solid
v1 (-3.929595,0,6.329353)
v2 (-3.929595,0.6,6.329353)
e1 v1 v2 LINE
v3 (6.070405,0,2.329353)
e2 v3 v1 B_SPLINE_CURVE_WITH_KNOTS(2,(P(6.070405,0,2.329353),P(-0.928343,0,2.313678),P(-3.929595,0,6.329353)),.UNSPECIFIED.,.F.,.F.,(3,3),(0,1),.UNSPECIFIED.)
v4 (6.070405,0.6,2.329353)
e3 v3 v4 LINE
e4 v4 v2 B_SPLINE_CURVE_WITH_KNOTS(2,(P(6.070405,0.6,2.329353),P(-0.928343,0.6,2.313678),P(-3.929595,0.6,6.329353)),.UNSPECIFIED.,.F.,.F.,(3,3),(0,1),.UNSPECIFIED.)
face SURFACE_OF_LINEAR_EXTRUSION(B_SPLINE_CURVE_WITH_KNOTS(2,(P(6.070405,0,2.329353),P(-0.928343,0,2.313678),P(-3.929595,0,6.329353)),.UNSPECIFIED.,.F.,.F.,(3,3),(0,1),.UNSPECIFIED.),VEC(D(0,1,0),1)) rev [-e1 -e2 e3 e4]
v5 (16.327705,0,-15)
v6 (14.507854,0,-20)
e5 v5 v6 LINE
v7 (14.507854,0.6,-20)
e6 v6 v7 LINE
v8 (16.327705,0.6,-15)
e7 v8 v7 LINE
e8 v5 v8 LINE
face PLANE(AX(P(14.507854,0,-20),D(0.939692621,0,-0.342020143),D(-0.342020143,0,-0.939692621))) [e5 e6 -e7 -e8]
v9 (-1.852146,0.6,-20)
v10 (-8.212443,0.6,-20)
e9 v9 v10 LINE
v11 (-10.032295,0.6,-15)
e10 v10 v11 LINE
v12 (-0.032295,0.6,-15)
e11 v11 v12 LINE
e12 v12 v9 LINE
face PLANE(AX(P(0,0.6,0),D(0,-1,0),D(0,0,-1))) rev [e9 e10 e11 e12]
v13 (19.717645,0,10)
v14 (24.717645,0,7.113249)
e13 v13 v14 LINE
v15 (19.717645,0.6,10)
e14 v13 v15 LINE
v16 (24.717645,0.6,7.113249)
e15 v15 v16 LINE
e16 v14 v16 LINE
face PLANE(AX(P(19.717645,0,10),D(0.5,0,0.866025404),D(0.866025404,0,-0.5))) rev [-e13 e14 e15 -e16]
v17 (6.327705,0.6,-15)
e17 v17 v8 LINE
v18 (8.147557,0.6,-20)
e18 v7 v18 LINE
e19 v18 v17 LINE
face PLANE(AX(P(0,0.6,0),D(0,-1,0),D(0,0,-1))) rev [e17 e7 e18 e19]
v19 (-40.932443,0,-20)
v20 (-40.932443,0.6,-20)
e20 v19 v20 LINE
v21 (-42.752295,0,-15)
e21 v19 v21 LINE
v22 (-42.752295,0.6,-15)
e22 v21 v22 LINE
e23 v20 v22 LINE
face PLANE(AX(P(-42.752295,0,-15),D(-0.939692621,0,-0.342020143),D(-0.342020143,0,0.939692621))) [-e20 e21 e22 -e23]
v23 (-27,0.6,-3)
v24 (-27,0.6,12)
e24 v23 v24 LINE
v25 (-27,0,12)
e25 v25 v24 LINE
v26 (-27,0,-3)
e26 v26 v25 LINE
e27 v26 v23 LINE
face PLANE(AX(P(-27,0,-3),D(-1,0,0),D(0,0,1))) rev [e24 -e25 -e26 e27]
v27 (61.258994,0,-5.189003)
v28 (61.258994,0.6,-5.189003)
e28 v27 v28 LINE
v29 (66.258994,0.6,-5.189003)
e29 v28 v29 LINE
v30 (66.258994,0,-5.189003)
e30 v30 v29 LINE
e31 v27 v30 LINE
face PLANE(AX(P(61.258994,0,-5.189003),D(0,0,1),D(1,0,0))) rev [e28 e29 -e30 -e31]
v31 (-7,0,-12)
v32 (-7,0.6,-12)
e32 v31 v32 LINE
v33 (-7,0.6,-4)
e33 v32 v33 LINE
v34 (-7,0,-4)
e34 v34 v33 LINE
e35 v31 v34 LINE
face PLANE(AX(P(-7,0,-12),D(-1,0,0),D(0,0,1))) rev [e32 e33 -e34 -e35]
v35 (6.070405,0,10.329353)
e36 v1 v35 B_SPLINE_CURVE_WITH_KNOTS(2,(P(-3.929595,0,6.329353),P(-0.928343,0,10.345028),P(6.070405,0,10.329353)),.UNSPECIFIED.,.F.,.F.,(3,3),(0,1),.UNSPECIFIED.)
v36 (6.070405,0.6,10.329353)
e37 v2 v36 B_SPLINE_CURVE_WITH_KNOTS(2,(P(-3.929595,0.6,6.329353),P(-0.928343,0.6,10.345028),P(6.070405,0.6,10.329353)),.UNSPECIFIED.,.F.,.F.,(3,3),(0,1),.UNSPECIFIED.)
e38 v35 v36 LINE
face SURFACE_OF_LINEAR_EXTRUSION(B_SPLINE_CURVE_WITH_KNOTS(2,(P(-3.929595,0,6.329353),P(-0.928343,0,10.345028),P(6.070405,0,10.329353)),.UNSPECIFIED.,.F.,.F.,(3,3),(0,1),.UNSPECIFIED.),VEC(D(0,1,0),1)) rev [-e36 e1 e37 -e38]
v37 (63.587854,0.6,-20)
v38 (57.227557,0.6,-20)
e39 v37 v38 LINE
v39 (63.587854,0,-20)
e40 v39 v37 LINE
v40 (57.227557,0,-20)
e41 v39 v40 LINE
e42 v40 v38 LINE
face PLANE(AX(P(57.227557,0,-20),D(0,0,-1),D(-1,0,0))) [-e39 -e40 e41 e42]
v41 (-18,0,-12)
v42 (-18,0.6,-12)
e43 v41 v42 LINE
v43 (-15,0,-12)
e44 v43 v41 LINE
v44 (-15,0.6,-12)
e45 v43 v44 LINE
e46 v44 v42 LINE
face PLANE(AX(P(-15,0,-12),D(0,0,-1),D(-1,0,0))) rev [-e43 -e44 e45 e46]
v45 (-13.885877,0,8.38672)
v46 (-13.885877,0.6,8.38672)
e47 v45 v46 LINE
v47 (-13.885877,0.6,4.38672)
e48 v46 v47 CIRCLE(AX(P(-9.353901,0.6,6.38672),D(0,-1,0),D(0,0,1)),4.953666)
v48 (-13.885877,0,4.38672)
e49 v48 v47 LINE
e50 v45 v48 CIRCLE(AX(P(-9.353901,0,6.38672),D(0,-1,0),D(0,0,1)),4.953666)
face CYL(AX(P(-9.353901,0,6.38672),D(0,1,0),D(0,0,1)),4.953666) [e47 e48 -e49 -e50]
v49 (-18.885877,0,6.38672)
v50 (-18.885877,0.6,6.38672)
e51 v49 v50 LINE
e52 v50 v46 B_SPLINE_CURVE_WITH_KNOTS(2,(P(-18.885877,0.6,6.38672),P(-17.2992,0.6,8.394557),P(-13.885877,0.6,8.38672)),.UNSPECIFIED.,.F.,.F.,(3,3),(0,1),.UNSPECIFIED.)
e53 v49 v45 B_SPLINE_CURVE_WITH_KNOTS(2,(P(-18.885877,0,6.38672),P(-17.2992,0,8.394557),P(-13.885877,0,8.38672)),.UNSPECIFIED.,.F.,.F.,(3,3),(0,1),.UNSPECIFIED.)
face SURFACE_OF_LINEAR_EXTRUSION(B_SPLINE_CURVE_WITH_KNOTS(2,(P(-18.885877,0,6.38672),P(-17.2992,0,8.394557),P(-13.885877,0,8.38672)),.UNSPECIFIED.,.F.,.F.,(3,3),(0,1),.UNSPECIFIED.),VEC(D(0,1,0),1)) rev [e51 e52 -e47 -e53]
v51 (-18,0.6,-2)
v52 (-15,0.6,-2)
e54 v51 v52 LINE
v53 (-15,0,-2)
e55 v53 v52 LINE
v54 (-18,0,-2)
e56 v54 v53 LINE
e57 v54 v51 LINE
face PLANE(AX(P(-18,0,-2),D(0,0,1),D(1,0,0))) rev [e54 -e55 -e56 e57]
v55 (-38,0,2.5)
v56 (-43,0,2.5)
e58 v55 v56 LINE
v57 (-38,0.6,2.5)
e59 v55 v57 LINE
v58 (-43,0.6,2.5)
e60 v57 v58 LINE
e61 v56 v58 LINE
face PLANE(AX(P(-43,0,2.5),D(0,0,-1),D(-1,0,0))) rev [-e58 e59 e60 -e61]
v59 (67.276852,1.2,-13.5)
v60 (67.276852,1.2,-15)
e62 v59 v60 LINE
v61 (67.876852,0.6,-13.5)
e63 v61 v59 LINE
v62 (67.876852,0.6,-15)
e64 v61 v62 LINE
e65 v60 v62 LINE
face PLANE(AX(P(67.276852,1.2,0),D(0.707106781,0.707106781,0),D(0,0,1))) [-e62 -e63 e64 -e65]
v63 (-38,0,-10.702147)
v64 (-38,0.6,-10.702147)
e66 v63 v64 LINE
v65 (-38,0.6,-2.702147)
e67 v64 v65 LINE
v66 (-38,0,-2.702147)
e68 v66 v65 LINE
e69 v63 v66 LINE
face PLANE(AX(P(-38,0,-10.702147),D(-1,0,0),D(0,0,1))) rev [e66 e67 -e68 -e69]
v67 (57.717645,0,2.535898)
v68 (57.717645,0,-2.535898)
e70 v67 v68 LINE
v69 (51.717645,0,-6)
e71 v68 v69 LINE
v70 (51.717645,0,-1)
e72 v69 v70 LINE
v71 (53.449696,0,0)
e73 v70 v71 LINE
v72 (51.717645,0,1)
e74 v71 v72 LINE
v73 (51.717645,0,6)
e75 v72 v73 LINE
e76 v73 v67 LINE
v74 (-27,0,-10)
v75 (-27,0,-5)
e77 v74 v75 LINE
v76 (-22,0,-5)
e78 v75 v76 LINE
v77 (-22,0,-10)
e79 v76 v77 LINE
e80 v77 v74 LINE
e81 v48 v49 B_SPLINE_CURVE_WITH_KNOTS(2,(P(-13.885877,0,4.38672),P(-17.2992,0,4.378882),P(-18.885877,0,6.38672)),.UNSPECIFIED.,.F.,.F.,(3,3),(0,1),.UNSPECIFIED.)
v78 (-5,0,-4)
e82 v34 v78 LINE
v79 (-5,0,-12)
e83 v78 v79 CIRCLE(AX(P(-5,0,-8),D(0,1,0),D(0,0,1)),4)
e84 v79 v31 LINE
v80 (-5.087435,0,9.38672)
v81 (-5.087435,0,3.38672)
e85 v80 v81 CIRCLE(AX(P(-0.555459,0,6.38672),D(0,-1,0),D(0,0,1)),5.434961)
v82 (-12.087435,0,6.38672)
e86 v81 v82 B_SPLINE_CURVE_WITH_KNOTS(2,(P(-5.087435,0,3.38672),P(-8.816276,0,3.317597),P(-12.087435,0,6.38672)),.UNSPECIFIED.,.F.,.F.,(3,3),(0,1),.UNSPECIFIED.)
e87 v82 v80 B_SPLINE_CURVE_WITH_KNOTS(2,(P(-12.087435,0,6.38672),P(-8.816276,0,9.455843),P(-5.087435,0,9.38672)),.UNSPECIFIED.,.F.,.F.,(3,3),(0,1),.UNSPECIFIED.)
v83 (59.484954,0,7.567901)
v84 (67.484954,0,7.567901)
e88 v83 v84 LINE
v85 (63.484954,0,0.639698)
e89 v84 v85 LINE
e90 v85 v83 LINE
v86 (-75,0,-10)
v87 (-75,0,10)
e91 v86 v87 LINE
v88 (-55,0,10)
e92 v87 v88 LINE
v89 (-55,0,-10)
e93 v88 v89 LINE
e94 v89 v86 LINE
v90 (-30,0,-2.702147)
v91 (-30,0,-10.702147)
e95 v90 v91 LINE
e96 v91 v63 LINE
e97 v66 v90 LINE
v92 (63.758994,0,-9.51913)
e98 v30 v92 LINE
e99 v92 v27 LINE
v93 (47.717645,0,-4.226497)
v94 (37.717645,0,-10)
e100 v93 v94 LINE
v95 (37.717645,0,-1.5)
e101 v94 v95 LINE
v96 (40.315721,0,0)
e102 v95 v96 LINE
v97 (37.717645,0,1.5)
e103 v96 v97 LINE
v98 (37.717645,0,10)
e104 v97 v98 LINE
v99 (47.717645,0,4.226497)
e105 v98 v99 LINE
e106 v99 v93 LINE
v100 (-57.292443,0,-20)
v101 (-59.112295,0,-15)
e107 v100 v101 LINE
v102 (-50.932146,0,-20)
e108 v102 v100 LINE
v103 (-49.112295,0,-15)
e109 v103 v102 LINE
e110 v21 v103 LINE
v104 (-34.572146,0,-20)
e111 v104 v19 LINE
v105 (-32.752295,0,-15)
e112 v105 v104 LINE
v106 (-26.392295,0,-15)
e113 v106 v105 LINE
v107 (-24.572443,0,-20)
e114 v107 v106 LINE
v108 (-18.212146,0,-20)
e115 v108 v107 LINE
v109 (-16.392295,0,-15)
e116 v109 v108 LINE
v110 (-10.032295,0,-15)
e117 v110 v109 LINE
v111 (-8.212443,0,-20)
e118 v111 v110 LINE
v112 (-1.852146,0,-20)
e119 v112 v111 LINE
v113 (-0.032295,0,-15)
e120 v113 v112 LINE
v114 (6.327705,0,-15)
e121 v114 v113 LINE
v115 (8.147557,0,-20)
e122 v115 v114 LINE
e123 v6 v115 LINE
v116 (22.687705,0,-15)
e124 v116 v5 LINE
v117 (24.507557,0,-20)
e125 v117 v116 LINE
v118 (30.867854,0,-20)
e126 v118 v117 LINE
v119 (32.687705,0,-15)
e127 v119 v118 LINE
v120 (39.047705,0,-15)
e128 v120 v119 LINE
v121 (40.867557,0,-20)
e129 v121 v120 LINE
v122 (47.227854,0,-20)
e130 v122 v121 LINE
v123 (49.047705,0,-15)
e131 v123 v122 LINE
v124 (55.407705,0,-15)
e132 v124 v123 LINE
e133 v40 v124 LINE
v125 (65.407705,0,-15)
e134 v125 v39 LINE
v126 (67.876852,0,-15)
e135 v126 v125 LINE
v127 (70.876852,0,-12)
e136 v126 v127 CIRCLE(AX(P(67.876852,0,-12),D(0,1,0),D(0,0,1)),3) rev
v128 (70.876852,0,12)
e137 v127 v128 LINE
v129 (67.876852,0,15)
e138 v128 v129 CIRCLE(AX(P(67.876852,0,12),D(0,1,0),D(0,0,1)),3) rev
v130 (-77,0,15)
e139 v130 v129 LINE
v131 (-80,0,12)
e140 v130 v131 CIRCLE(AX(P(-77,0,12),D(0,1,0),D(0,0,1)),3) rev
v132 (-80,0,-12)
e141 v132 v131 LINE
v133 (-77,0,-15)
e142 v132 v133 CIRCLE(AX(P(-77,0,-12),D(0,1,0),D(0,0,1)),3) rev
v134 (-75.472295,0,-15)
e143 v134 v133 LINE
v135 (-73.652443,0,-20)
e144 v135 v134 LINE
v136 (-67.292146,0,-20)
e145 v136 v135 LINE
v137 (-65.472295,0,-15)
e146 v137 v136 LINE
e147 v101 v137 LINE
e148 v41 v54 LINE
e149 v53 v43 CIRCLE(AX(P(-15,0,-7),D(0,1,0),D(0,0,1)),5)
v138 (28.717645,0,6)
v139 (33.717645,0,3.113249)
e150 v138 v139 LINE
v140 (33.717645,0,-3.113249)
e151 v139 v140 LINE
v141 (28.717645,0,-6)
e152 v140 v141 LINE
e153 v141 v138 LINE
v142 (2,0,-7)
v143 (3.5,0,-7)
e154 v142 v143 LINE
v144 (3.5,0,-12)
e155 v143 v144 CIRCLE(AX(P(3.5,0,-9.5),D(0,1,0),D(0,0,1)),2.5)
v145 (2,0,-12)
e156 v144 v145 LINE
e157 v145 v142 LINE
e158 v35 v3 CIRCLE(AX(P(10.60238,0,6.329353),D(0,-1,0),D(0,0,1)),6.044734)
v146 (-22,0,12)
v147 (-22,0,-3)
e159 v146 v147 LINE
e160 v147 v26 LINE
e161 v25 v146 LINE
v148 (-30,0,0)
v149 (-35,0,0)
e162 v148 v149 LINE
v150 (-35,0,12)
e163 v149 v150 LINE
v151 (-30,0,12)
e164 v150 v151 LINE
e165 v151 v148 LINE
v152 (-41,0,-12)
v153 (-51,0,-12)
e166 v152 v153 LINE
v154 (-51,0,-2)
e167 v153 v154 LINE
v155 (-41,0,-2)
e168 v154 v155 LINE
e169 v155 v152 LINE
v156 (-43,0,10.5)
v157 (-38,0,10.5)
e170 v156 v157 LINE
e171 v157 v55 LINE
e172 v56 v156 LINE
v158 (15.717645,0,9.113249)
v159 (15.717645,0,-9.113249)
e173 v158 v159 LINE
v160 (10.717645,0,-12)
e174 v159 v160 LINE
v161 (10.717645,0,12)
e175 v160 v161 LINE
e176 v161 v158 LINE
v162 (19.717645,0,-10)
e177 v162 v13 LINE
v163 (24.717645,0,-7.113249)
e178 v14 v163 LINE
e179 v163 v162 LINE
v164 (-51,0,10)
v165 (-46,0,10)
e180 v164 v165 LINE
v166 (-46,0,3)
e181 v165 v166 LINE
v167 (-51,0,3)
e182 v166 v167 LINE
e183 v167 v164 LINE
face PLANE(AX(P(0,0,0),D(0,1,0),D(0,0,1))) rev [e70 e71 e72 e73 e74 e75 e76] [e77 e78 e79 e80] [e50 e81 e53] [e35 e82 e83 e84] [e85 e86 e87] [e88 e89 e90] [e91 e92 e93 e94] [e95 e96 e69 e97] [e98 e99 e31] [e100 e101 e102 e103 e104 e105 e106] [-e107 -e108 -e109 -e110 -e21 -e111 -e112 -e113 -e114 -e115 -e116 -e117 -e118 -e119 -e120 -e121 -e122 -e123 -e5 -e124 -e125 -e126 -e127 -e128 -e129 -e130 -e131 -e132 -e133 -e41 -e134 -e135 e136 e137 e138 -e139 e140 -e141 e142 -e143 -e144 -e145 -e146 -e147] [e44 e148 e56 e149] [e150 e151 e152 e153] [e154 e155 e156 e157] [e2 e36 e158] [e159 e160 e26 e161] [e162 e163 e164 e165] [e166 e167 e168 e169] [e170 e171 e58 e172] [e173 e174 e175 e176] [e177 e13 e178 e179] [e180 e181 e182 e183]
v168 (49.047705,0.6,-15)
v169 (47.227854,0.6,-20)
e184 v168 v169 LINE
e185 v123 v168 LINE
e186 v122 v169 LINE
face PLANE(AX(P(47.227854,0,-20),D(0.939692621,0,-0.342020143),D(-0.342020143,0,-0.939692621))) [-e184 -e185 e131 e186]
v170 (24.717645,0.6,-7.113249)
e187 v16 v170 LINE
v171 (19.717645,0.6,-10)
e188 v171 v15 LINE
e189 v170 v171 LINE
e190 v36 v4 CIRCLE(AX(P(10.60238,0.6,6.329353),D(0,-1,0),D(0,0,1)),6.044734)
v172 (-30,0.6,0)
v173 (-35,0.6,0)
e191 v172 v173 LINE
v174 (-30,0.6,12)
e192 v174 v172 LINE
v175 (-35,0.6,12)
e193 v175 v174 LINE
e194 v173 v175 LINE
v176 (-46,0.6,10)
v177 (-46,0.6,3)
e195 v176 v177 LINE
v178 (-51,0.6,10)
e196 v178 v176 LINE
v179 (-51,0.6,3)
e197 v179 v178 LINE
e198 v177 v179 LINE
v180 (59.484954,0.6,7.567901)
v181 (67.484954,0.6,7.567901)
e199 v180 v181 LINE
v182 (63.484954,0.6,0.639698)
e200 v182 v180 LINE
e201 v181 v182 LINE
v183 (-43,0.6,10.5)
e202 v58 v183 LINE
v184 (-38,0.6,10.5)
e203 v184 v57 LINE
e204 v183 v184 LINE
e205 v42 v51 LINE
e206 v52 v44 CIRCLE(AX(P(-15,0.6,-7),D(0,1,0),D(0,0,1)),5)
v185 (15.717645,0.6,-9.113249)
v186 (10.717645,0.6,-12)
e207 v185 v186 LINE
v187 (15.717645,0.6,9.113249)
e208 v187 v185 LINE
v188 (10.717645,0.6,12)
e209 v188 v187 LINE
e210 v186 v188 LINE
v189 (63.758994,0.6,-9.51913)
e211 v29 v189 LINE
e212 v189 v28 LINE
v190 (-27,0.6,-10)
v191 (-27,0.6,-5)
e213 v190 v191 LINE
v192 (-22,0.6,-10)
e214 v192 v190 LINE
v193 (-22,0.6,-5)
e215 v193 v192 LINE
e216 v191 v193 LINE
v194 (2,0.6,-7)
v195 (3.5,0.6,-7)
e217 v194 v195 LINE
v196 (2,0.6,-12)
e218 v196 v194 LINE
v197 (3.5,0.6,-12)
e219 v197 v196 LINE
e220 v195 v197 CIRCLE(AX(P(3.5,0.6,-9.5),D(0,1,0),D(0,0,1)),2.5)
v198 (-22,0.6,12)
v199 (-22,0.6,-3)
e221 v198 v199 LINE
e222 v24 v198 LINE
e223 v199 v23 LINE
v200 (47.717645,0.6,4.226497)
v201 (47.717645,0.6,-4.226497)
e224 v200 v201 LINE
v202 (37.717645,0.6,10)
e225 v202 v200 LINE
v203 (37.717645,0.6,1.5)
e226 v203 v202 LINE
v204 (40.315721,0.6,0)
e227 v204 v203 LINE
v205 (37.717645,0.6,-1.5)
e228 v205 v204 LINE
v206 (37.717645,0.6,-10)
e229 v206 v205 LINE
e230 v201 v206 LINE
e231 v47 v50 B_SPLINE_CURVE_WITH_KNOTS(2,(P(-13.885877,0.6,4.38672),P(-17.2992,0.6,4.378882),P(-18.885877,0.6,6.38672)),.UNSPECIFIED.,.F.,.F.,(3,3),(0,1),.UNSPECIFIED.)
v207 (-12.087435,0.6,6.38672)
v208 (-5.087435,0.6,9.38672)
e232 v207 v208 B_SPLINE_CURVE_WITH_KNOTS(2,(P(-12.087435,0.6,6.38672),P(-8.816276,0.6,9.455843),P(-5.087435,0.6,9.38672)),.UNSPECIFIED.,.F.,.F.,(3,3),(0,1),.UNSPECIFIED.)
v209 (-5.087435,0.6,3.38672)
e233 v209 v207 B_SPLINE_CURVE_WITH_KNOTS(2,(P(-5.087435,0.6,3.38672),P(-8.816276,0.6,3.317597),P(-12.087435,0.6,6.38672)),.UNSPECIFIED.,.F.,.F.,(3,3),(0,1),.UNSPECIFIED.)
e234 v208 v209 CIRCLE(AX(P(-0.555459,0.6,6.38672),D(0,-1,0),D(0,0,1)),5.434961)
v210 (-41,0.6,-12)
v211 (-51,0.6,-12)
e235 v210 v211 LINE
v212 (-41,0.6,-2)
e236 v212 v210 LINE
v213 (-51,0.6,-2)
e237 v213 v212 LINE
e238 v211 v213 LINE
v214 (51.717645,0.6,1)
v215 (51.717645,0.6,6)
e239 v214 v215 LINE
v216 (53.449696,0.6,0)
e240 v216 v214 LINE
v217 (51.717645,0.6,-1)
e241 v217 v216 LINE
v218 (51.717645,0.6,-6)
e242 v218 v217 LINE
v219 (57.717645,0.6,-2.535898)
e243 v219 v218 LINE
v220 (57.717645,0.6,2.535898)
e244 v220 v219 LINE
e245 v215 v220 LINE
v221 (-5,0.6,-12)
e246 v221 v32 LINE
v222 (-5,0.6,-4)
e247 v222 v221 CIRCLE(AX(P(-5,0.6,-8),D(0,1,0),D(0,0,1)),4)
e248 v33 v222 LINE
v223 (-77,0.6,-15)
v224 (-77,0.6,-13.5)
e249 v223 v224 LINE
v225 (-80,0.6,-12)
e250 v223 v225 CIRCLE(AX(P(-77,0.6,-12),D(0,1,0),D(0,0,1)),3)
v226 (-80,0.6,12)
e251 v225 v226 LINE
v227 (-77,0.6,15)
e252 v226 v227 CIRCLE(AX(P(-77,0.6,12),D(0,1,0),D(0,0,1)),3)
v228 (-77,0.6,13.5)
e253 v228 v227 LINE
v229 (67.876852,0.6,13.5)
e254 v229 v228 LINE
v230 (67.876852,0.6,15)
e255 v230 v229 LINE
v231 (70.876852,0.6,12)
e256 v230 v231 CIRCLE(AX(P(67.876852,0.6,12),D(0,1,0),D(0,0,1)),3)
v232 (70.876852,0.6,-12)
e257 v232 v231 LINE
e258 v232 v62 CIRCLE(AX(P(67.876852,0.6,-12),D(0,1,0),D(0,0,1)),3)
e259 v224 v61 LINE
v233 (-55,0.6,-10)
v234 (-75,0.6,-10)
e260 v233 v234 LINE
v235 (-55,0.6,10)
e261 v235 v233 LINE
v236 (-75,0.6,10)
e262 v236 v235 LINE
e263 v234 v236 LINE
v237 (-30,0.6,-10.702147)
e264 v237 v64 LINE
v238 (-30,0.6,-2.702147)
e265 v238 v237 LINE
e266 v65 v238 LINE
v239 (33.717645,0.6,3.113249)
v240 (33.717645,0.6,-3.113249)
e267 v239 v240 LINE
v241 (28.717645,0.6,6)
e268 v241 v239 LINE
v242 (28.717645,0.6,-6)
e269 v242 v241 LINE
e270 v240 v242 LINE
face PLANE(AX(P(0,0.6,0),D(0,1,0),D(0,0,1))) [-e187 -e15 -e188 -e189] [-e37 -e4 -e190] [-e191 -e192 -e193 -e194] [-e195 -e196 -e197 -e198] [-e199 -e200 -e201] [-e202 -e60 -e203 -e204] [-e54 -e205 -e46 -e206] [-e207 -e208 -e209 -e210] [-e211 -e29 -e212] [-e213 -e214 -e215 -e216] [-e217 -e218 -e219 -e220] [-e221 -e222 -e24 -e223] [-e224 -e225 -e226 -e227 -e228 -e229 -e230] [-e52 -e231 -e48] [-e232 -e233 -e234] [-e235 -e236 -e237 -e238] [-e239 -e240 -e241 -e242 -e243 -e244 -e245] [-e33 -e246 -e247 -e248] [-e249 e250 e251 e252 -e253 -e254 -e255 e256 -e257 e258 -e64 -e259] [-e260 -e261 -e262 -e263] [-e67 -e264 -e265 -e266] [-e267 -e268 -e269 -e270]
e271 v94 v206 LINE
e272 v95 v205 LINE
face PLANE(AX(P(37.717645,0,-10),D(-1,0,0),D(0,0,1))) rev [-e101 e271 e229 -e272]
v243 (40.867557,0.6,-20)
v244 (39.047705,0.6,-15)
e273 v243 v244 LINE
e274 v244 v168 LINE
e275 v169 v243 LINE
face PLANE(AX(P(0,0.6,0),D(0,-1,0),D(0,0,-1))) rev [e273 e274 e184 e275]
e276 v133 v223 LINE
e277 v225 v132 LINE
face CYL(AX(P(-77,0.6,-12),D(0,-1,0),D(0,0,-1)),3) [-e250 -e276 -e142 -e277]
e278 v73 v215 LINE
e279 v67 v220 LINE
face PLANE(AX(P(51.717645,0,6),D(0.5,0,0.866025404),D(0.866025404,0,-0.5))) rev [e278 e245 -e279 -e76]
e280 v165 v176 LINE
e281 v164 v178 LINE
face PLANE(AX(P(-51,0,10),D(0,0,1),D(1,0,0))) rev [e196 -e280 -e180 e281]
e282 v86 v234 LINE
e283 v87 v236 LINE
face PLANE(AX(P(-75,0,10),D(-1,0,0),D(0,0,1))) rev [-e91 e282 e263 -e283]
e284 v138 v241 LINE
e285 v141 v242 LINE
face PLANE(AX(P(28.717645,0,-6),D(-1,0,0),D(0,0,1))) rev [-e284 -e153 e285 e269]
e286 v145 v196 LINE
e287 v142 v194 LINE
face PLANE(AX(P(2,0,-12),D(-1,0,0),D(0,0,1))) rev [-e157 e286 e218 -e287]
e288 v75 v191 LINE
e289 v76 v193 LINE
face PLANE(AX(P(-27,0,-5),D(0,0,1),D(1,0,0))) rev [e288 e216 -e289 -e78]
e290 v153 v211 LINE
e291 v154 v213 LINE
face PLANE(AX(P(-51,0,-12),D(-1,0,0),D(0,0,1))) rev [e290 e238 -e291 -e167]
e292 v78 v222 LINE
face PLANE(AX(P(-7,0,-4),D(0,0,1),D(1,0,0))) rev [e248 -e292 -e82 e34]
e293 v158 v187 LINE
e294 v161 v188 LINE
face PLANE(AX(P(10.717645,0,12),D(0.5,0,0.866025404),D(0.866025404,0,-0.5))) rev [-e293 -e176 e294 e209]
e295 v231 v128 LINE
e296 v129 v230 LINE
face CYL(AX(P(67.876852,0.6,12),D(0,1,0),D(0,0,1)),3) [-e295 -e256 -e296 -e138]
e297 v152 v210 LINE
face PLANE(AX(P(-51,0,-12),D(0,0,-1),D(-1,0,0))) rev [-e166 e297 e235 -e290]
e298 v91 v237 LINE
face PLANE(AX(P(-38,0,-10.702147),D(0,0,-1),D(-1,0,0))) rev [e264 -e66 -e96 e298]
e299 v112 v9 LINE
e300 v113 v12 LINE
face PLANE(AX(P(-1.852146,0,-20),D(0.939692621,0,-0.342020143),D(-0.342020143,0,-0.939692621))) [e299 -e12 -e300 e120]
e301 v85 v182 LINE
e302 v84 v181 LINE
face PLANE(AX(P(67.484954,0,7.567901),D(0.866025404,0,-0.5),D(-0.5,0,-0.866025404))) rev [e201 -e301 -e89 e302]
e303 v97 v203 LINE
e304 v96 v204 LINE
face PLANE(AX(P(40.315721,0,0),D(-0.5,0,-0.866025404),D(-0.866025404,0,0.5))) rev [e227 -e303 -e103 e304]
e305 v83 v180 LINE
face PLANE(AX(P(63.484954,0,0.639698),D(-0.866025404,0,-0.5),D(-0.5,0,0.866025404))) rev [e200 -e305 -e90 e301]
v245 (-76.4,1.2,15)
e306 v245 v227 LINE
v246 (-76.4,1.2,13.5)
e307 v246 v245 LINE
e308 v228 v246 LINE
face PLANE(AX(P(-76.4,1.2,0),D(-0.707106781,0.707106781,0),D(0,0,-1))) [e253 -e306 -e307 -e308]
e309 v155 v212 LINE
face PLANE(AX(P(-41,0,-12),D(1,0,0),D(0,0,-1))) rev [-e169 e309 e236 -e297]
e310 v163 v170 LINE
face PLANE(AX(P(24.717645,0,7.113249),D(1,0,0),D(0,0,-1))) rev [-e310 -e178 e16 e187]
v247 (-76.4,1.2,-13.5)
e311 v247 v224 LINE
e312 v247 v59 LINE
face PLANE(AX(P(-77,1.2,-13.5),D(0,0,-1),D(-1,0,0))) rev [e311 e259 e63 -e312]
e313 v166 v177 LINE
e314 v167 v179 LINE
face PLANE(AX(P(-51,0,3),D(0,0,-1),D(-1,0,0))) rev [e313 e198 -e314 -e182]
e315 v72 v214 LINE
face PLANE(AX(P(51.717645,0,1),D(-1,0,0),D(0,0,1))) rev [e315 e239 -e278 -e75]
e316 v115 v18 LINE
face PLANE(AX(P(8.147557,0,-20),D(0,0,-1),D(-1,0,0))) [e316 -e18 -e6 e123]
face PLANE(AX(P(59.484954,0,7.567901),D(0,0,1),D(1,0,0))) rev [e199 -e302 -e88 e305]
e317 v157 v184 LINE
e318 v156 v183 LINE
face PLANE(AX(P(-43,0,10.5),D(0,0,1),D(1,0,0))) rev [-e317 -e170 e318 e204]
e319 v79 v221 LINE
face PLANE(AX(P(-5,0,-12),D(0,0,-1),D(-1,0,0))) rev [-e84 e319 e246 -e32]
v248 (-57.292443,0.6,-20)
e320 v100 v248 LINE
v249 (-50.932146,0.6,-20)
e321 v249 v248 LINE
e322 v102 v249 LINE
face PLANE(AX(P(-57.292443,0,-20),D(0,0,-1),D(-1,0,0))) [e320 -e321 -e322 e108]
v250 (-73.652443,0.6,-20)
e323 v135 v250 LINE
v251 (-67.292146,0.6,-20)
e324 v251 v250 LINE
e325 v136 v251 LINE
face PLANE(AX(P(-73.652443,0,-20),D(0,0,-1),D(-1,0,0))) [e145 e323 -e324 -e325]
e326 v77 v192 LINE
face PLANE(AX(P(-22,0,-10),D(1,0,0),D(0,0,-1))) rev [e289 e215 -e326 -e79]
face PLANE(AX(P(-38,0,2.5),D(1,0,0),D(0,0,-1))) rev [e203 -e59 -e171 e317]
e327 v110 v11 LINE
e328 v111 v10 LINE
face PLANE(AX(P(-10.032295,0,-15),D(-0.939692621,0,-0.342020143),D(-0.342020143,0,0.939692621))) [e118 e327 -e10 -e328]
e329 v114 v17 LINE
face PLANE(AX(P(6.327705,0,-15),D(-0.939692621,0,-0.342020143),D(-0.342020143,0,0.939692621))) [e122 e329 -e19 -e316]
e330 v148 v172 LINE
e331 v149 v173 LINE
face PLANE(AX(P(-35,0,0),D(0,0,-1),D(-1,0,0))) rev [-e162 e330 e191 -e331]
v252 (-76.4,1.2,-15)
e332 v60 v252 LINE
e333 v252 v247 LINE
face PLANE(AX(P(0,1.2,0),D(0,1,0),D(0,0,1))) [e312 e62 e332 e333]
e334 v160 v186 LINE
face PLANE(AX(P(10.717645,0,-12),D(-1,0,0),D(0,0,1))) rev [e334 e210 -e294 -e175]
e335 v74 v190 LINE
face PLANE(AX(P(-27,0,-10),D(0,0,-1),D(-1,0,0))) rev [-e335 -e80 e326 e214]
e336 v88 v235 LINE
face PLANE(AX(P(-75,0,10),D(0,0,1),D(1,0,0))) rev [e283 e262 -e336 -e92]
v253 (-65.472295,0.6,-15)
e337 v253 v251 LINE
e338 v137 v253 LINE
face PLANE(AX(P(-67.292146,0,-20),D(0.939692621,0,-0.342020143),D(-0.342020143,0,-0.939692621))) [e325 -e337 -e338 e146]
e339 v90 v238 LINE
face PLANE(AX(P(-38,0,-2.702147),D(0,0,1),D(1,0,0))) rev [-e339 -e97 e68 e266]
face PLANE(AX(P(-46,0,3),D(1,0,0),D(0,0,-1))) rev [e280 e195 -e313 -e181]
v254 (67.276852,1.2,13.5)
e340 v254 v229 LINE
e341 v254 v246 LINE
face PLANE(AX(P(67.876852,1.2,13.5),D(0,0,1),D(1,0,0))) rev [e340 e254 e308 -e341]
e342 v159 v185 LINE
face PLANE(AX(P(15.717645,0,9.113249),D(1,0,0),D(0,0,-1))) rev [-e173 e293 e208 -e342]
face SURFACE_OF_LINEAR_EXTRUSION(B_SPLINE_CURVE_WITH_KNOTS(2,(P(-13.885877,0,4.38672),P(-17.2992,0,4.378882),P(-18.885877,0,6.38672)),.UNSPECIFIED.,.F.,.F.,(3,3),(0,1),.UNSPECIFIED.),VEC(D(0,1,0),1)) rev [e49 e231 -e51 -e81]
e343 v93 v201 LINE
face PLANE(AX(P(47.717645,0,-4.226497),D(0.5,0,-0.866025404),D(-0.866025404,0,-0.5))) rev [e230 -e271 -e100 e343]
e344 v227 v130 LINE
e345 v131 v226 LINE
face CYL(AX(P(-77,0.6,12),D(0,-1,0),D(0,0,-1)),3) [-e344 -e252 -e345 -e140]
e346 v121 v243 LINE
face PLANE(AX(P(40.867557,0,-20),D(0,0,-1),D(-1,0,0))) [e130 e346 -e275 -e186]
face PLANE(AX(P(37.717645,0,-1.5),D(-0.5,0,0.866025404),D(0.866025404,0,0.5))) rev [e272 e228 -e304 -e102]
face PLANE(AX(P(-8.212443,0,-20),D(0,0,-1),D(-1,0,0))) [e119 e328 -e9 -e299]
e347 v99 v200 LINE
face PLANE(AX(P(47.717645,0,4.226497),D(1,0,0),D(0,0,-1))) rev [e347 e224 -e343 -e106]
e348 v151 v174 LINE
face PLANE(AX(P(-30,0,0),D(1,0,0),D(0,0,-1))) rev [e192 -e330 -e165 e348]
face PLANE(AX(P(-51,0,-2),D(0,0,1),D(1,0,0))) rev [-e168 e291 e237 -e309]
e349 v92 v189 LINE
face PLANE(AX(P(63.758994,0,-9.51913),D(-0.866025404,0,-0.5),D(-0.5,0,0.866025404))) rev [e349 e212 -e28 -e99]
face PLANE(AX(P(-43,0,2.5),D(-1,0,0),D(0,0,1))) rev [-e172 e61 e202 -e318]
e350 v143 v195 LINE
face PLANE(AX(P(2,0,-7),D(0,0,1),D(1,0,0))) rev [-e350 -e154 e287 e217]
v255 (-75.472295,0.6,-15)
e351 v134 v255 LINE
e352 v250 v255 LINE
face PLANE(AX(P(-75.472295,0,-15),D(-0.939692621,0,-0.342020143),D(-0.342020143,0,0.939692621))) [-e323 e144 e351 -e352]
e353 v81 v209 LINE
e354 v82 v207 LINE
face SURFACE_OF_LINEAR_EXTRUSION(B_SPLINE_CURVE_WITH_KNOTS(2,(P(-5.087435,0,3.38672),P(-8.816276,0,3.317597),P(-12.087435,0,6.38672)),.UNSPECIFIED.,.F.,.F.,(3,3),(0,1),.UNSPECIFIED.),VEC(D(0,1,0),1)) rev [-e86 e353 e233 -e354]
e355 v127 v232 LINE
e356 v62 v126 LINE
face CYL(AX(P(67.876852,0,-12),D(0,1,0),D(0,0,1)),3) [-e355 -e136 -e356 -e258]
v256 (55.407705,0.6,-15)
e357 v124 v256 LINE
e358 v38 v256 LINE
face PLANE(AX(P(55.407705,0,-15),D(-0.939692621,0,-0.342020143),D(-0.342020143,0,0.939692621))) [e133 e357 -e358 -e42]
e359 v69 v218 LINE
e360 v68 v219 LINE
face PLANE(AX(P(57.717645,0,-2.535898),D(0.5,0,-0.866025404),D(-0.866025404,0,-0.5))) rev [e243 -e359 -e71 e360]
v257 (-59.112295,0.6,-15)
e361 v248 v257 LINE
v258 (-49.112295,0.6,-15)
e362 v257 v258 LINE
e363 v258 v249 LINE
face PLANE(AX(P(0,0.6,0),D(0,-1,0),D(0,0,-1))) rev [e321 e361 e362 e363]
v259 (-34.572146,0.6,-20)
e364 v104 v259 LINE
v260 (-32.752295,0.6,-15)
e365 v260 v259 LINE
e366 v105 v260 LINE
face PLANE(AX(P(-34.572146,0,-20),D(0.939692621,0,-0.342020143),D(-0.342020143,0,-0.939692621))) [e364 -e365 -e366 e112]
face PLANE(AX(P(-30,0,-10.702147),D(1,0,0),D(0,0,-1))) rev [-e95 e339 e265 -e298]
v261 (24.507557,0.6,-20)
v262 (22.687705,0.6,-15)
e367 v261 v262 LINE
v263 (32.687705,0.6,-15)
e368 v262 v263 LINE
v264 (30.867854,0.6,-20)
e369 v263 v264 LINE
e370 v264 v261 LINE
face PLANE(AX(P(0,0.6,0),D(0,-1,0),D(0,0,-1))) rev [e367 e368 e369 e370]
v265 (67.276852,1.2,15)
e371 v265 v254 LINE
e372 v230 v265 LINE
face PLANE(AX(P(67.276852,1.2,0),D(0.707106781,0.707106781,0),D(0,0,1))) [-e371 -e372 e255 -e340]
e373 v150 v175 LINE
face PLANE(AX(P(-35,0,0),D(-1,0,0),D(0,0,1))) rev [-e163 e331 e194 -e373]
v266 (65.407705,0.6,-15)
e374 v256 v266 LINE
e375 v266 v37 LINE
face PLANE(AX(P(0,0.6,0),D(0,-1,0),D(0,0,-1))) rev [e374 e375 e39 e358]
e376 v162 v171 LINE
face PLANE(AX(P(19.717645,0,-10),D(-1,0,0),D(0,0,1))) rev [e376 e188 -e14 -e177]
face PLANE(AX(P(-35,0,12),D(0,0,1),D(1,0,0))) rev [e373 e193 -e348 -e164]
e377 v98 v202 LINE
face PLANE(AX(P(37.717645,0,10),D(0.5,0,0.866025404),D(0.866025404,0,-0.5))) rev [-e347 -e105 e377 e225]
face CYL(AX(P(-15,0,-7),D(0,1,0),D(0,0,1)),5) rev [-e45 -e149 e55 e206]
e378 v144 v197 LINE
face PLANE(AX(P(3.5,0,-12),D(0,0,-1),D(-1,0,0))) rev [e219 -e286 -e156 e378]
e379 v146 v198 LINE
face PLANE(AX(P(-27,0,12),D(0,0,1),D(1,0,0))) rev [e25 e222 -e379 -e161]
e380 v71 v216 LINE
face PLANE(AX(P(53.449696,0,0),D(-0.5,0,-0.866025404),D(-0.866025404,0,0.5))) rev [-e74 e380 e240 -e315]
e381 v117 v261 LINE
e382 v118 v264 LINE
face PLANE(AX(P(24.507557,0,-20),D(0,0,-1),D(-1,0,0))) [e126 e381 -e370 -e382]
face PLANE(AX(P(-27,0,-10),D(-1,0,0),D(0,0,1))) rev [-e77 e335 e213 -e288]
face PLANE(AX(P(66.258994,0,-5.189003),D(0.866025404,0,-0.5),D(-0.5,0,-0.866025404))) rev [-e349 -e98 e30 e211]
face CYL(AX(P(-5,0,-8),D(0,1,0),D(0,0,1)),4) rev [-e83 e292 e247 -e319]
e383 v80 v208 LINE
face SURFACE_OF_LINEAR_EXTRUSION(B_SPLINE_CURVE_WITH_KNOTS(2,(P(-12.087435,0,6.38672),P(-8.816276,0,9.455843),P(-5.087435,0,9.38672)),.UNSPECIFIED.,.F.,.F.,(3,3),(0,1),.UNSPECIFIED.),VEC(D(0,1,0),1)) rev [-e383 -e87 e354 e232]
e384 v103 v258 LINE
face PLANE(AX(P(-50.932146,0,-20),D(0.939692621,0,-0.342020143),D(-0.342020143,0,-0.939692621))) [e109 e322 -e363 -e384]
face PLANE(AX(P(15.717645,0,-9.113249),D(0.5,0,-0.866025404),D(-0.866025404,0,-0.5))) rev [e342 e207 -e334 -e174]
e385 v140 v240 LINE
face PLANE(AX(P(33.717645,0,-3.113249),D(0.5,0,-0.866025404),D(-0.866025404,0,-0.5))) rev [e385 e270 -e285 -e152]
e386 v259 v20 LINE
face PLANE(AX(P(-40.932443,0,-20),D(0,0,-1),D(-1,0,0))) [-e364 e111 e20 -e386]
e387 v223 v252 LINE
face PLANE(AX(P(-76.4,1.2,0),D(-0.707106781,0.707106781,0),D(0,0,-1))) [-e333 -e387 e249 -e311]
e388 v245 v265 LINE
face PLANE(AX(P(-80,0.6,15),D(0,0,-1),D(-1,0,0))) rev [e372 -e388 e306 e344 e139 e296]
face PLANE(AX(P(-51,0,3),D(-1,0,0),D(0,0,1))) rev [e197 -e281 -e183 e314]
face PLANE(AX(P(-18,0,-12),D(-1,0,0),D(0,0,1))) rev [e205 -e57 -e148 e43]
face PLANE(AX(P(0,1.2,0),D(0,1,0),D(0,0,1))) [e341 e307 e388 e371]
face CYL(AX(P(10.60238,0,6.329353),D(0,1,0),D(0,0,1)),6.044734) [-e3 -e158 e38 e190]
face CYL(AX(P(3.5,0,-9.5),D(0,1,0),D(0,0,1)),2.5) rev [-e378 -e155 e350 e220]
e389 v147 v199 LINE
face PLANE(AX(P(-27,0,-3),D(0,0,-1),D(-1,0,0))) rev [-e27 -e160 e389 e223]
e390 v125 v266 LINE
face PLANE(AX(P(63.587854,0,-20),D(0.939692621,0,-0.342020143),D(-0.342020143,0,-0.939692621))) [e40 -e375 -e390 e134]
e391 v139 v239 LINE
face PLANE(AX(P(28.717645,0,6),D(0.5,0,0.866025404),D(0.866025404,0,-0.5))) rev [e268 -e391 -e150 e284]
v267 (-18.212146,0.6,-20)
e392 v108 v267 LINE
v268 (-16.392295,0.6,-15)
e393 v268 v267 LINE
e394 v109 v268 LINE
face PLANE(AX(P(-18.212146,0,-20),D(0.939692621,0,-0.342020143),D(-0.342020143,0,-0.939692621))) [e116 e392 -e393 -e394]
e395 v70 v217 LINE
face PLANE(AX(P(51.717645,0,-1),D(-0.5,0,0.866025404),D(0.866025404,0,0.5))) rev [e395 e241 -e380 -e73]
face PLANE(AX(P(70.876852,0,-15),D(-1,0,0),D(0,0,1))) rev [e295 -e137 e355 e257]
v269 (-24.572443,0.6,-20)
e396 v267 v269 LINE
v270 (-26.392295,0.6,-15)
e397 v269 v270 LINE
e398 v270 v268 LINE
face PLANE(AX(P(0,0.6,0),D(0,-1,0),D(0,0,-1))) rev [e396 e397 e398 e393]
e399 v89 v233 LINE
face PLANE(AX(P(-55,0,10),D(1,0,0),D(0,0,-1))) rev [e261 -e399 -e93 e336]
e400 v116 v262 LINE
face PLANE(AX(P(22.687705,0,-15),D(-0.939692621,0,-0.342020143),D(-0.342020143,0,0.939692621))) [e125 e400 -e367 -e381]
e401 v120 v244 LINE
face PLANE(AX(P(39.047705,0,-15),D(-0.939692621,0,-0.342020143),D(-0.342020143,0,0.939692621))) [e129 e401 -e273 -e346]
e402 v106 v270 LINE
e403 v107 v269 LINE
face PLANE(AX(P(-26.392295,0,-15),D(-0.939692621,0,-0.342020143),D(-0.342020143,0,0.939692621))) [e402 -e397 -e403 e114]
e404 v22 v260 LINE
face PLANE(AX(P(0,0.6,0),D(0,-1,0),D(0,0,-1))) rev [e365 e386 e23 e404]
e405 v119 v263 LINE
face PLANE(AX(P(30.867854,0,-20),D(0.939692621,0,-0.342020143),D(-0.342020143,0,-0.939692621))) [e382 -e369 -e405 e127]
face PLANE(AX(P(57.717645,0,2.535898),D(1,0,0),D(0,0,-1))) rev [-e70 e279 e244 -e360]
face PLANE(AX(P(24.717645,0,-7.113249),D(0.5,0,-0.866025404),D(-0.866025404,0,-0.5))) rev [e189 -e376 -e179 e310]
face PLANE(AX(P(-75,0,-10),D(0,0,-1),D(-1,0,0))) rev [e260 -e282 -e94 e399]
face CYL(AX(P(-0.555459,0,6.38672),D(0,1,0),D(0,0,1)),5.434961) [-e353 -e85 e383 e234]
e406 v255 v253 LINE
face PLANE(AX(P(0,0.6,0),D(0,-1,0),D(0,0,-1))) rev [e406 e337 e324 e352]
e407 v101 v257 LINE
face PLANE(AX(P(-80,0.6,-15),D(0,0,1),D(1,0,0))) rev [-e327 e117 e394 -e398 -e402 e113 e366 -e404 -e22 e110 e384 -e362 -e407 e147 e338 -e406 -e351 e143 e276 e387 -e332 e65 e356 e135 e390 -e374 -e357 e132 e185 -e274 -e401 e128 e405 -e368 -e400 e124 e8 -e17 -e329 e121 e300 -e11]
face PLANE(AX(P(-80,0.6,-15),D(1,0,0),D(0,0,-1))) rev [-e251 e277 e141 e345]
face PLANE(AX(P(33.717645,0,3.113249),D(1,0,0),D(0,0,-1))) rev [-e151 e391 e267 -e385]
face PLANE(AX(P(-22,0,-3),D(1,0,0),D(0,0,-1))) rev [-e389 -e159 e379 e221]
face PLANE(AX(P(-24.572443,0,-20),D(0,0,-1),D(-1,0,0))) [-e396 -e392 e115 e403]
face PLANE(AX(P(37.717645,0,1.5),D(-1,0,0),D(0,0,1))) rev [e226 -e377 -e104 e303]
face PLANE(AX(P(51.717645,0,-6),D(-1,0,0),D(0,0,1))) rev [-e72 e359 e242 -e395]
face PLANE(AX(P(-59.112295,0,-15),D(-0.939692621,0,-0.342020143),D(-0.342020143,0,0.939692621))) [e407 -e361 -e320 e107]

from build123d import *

# Parameters (mm, degrees)
SKETCH1_W             = 160
SKETCH1_H             = 30
BOSS_EXTRUDE1_DEPTH   = 0.6
SKETCH2_W             = 20
SKETCH2_H             = 20
SKETCH2_W_2           = 10
SKETCH2_H_2           = 10
SKETCH2_W_3           = 8
SKETCH2_H_3           = 8
SKETCH2_W_4           = 5
SKETCH2_H_4           = 5
SKETCH2_H_5           = 7
SKETCH2_H_6           = 12
SKETCH2_H_7           = 15
CUT_EXTRUDE1_DEPTH    = 0.6
CUT_EXTRUDE3_DEPTH    = 0.6
CUT_EXTRUDE4_DEPTH    = 0.6
CUT_EXTRUDE5_DEPTH    = 0.6
SKETCH7_W             = 9.123147958
SKETCH7_H             = 30
CUT_EXTRUDE6_DEPTH    = 0.6
BOSS_EXTRUDE2_DEPTH   = 0.6
BOSS_EXTRUDE2_2_DEPTH = 0.6
BOSS_EXTRUDE2_3_DEPTH = 0.6
BOSS_EXTRUDE2_4_DEPTH = 0.6
BOSS_EXTRUDE2_5_DEPTH = 0.6
BOSS_EXTRUDE2_6_DEPTH = 0.6
BOSS_EXTRUDE2_7_DEPTH = 0.6
BOSS_EXTRUDE2_8_DEPTH = 0.6
BOSS_EXTRUDE2_9_DEPTH = 0.6
FILLET1_R             = 3
SKETCH9_W             = 144.876852042
SKETCH9_H             = 1.5
BOSS_EXTRUDE3_DEPTH   = 0.6
CHAMFER1_SIZE         = 0.6


with BuildPart() as part:
    # Sketch1 → Boss-Extrude1 (new body)
    with BuildSketch(Plane(origin=(0, 0, 0), x_dir=(1, 0, 0), z_dir=(0, 1, 0))):
        Rectangle(SKETCH1_W, SKETCH1_H)
    extrude(amount=BOSS_EXTRUDE1_DEPTH)

    # Sketch2 → Cut-Extrude1 (cut)
    with BuildSketch(Plane(origin=(0, 0.6, 0), x_dir=(1, 0, 0), z_dir=(0, 1, 0))):
        with Locations((-65, 0)):
            Rectangle(SKETCH2_W, SKETCH2_H)
        with BuildLine():
            Line((-5, 12), (-7, 12))
            Line((-7, 12), (-7, 4))
            Line((-7, 4), (-5, 4))
            ThreePointArc((-5, 4), (-1, 8), (-5, 12))
        make_face()
        with Locations((-46, 7)):
            Rectangle(SKETCH2_W_2, SKETCH2_H_2)
        with Locations((-34, 6.702147352)):
            Rectangle(SKETCH2_W_3, SKETCH2_H_3)
        with Locations((-24.5, 7.5)):
            Rectangle(SKETCH2_W_4, SKETCH2_H_4)
        with Locations((-48.5, -6.5)):
            Rectangle(SKETCH2_W_4, SKETCH2_H_5)
        with BuildLine():
            Line((-15, 12), (-18, 12))
            Line((-18, 12), (-18, 2))
            Line((-18, 2), (-15, 2))
            ThreePointArc((-15, 2), (-10, 7), (-15, 12))
        make_face()
        with Locations((-40.5, -6.5)):
            Rectangle(SKETCH2_W_4, SKETCH2_H_3)
        with Locations((-32.5, -6)):
            Rectangle(SKETCH2_W_4, SKETCH2_H_6)
        with Locations((-24.5, -4.5)):
            Rectangle(SKETCH2_W_4, SKETCH2_H_7)
        with BuildLine():
            Line((3.5, 12), (2, 12))
            Line((2, 12), (2, 7))
            Line((2, 7), (3.5, 7))
            ThreePointArc((3.5, 7), (6, 9.5), (3.5, 12))
        make_face()
        with BuildLine():
            ThreePointArc((6.07040459, -2.329353078), (4.557646776, -6.329353078), (6.07040459, -10.329353078))
            add(Edge.make_bspline(
                [(6.07040459, -10.329353078), (-0.928342944, -10.345027892), (-3.92959541, -6.329353078)],
                knots=[0, 0, 0, 1, 1, 1], degree=2))
            add(Edge.make_bspline(
                [(6.07040459, -2.329353078), (-0.928342944, -2.313678264), (-3.92959541, -6.329353078)],
                knots=[0, 0, 0, 1, 1, 1], degree=2))
        make_face()
        with BuildLine():
            ThreePointArc((-5.087434715, -3.386719861), (-5.990420234, -6.386719861), (-5.087434715, -9.386719861))
            add(Edge.make_bspline(
                [(-5.087434715, -9.386719861), (-8.816275614, -9.455842755), (-12.087434715, -6.386719861)],
                knots=[0, 0, 0, 1, 1, 1], degree=2))
            add(Edge.make_bspline(
                [(-5.087434715, -3.386719861), (-8.816275614, -3.317596967), (-12.087434715, -6.386719861)],
                knots=[0, 0, 0, 1, 1, 1], degree=2))
        make_face()
        with BuildLine():
            ThreePointArc((-13.885876864, -4.386719861), (-14.307566838, -6.386719861), (-13.885876864, -8.386719861))
            add(Edge.make_bspline(
                [(-13.885876864, -8.386719861), (-17.299200456, -8.394557268), (-18.885876864, -6.386719861)],
                knots=[0, 0, 0, 1, 1, 1], degree=2))
            add(Edge.make_bspline(
                [(-13.885876864, -4.386719861), (-17.299200456, -4.378882454), (-18.885876864, -6.386719861)],
                knots=[0, 0, 0, 1, 1, 1], degree=2))
        make_face()
    extrude(amount=-CUT_EXTRUDE1_DEPTH, mode=Mode.SUBTRACT)

    # Sketch3 → Cut-Extrude3 (cut)
    with BuildSketch(Plane(origin=(0, 0.6, 0), x_dir=(1, 0, 0), z_dir=(0, 1, 0))):
        Polygon((10.717645067, 12), (10.717645067, -12), (15.717645067, -9.113248654), (15.717645067, 9.113248654), align=None)
        Polygon((19.717645067, 10), (19.717645067, -10), (24.717645067, -7.113248654), (24.717645067, 7.113248654), align=None)
        Polygon((28.717645067, 6), (28.717645067, -6), (33.717645067, -3.113248654), (33.717645067, 3.113248654), align=None)
    extrude(amount=-CUT_EXTRUDE3_DEPTH, mode=Mode.SUBTRACT)

    # Sketch5 → Cut-Extrude4 (cut)
    with BuildSketch(Plane(origin=(0, 0.6, 0), x_dir=(1, 0, 0), z_dir=(0, 1, 0))):
        Polygon((37.717645067, 10), (37.717645067, 1.5), (40.315721279, 0), (37.717645067, -1.5), (37.717645067, -10), (47.717645067, -4.226497308), (47.717645067, 4.226497308), align=None)
        Polygon((51.717645067, 6), (51.717645067, 1), (53.449695875, 0), (51.717645067, -1), (51.717645067, -6), (57.717645067, -2.535898385), (57.717645067, 2.535898385), align=None)
    extrude(amount=-CUT_EXTRUDE4_DEPTH, mode=Mode.SUBTRACT)

    # Sketch6 → Cut-Extrude5 (cut)
    with BuildSketch(Plane(origin=(0, 0.6, 0), x_dir=(1, 0, 0), z_dir=(0, 1, 0))):
        Polygon((63.758994289, 9.519130037), (61.258994289, 5.189003018), (66.258994289, 5.189003018), align=None)
        Polygon((63.484953651, -0.639697818), (59.484953651, -7.567901048), (67.484953651, -7.567901048), align=None)
    extrude(amount=-CUT_EXTRUDE5_DEPTH, mode=Mode.SUBTRACT)

    # Sketch7 → Cut-Extrude6 (cut)
    with BuildSketch(Plane(origin=(0, 0.6, 0), x_dir=(1, 0, 0), z_dir=(0, 1, 0))):
        with Locations((75.438426021, 0)):
            Rectangle(SKETCH7_W, SKETCH7_H)
    extrude(amount=-CUT_EXTRUDE6_DEPTH, mode=Mode.SUBTRACT)

    # Fillet1
    fillet1_edges = [part.edges().sort_by_distance(p)[0] for p in [
        (70.876852042, 0.3, 15),
        (70.876852042, 0.3, -15),
        (-80, 0.3, 15),
        (-80, 0.3, -15),
    ]]
    fillet(fillet1_edges, radius=FILLET1_R)



with BuildPart() as body_2:
    # Sketch8 → Boss-Extrude2 (new body)
    with BuildSketch(Plane(origin=(0, 0.6, 0), x_dir=(1, 0, 0), z_dir=(0, 1, 0))):
        Polygon((-75.472294668, 15), (-73.652443497, 20), (-67.292145839, 20), (-65.472294668, 15), align=None)
    extrude(amount=-BOSS_EXTRUDE2_DEPTH)


with BuildPart() as body_3:
    # Sketch8 → Boss-Extrude2 2 (new body)
    with BuildSketch(Plane(origin=(0, 0.6, 0), x_dir=(1, 0, 0), z_dir=(0, 1, 0))):
        Polygon((-59.112294668, 15), (-57.292443497, 20), (-50.932145839, 20), (-49.112294668, 15), align=None)
    extrude(amount=-BOSS_EXTRUDE2_2_DEPTH)


with BuildPart() as body_4:
    # Sketch8 → Boss-Extrude2 3 (new body)
    with BuildSketch(Plane(origin=(0, 0.6, 0), x_dir=(1, 0, 0), z_dir=(0, 1, 0))):
        Polygon((-42.752294668, 15), (-40.932443497, 20), (-34.572145839, 20), (-32.752294668, 15), align=None)
    extrude(amount=-BOSS_EXTRUDE2_3_DEPTH)


with BuildPart() as body_5:
    # Sketch8 → Boss-Extrude2 4 (new body)
    with BuildSketch(Plane(origin=(0, 0.6, 0), x_dir=(1, 0, 0), z_dir=(0, 1, 0))):
        Polygon((-26.392294668, 15), (-24.572443497, 20), (-18.212145839, 20), (-16.392294668, 15), align=None)
    extrude(amount=-BOSS_EXTRUDE2_4_DEPTH)


with BuildPart() as body_6:
    # Sketch8 → Boss-Extrude2 5 (new body)
    with BuildSketch(Plane(origin=(0, 0.6, 0), x_dir=(1, 0, 0), z_dir=(0, 1, 0))):
        Polygon((-10.032294668, 15), (-8.212443497, 20), (-1.852145839, 20), (-0.032294668, 15), align=None)
    extrude(amount=-BOSS_EXTRUDE2_5_DEPTH)


with BuildPart() as body_7:
    # Sketch8 → Boss-Extrude2 6 (new body)
    with BuildSketch(Plane(origin=(0, 0.6, 0), x_dir=(1, 0, 0), z_dir=(0, 1, 0))):
        Polygon((6.327705332, 15), (8.147556503, 20), (14.507854161, 20), (16.327705332, 15), align=None)
    extrude(amount=-BOSS_EXTRUDE2_6_DEPTH)


with BuildPart() as body_8:
    # Sketch8 → Boss-Extrude2 7 (new body)
    with BuildSketch(Plane(origin=(0, 0.6, 0), x_dir=(1, 0, 0), z_dir=(0, 1, 0))):
        Polygon((22.687705332, 15), (24.507556503, 20), (30.867854161, 20), (32.687705332, 15), align=None)
    extrude(amount=-BOSS_EXTRUDE2_7_DEPTH)


with BuildPart() as body_9:
    # Sketch8 → Boss-Extrude2 8 (new body)
    with BuildSketch(Plane(origin=(0, 0.6, 0), x_dir=(1, 0, 0), z_dir=(0, 1, 0))):
        Polygon((39.047705332, 15), (40.867556503, 20), (47.227854161, 20), (49.047705332, 15), align=None)
    extrude(amount=-BOSS_EXTRUDE2_8_DEPTH)


with BuildPart() as body_10:
    # Sketch8 → Boss-Extrude2 9 (new body)
    with BuildSketch(Plane(origin=(0, 0.6, 0), x_dir=(1, 0, 0), z_dir=(0, 1, 0))):
        Polygon((55.407705332, 15), (57.227556503, 20), (63.587854161, 20), (65.407705332, 15), align=None)
    extrude(amount=-BOSS_EXTRUDE2_9_DEPTH)


with BuildPart() as part_1:
    add(part.part)

    add(body_2.part)  # Boss-Extrude3 merges body 2

    add(body_3.part)  # Boss-Extrude3 merges body 3

    add(body_4.part)  # Boss-Extrude3 merges body 4

    add(body_5.part)  # Boss-Extrude3 merges body 5

    add(body_6.part)  # Boss-Extrude3 merges body 6

    add(body_7.part)  # Boss-Extrude3 merges body 7

    add(body_8.part)  # Boss-Extrude3 merges body 8

    add(body_9.part)  # Boss-Extrude3 merges body 9

    add(body_10.part)  # Boss-Extrude3 merges body 10
    # Sketch9 → Boss-Extrude3 (add)
    with BuildSketch(Plane(origin=(0, 0.6, 0), x_dir=(1, 0, 0), z_dir=(0, 1, 0))):
        with Locations((-4.561573979, 14.25)):
            Rectangle(SKETCH9_W, SKETCH9_H)
        with Locations((-4.561573979, -14.25)):
            Rectangle(SKETCH9_W, SKETCH9_H)
    extrude(amount=BOSS_EXTRUDE3_DEPTH)

    # Chamfer1
    chamfer1_edges = [part_1.edges().sort_by_distance(p)[0] for p in [
        (67.876852042, 1.2, 14.25),
        (67.876852042, 1.2, -14.25),
        (-77, 1.2, 14.25),
        (-77, 1.2, -14.25),
    ]]
    chamfer(chamfer1_edges, length=CHAMFER1_SIZE - 0.0001)  # a hair under: the kernel refuses the full size


solid = part_1.part
